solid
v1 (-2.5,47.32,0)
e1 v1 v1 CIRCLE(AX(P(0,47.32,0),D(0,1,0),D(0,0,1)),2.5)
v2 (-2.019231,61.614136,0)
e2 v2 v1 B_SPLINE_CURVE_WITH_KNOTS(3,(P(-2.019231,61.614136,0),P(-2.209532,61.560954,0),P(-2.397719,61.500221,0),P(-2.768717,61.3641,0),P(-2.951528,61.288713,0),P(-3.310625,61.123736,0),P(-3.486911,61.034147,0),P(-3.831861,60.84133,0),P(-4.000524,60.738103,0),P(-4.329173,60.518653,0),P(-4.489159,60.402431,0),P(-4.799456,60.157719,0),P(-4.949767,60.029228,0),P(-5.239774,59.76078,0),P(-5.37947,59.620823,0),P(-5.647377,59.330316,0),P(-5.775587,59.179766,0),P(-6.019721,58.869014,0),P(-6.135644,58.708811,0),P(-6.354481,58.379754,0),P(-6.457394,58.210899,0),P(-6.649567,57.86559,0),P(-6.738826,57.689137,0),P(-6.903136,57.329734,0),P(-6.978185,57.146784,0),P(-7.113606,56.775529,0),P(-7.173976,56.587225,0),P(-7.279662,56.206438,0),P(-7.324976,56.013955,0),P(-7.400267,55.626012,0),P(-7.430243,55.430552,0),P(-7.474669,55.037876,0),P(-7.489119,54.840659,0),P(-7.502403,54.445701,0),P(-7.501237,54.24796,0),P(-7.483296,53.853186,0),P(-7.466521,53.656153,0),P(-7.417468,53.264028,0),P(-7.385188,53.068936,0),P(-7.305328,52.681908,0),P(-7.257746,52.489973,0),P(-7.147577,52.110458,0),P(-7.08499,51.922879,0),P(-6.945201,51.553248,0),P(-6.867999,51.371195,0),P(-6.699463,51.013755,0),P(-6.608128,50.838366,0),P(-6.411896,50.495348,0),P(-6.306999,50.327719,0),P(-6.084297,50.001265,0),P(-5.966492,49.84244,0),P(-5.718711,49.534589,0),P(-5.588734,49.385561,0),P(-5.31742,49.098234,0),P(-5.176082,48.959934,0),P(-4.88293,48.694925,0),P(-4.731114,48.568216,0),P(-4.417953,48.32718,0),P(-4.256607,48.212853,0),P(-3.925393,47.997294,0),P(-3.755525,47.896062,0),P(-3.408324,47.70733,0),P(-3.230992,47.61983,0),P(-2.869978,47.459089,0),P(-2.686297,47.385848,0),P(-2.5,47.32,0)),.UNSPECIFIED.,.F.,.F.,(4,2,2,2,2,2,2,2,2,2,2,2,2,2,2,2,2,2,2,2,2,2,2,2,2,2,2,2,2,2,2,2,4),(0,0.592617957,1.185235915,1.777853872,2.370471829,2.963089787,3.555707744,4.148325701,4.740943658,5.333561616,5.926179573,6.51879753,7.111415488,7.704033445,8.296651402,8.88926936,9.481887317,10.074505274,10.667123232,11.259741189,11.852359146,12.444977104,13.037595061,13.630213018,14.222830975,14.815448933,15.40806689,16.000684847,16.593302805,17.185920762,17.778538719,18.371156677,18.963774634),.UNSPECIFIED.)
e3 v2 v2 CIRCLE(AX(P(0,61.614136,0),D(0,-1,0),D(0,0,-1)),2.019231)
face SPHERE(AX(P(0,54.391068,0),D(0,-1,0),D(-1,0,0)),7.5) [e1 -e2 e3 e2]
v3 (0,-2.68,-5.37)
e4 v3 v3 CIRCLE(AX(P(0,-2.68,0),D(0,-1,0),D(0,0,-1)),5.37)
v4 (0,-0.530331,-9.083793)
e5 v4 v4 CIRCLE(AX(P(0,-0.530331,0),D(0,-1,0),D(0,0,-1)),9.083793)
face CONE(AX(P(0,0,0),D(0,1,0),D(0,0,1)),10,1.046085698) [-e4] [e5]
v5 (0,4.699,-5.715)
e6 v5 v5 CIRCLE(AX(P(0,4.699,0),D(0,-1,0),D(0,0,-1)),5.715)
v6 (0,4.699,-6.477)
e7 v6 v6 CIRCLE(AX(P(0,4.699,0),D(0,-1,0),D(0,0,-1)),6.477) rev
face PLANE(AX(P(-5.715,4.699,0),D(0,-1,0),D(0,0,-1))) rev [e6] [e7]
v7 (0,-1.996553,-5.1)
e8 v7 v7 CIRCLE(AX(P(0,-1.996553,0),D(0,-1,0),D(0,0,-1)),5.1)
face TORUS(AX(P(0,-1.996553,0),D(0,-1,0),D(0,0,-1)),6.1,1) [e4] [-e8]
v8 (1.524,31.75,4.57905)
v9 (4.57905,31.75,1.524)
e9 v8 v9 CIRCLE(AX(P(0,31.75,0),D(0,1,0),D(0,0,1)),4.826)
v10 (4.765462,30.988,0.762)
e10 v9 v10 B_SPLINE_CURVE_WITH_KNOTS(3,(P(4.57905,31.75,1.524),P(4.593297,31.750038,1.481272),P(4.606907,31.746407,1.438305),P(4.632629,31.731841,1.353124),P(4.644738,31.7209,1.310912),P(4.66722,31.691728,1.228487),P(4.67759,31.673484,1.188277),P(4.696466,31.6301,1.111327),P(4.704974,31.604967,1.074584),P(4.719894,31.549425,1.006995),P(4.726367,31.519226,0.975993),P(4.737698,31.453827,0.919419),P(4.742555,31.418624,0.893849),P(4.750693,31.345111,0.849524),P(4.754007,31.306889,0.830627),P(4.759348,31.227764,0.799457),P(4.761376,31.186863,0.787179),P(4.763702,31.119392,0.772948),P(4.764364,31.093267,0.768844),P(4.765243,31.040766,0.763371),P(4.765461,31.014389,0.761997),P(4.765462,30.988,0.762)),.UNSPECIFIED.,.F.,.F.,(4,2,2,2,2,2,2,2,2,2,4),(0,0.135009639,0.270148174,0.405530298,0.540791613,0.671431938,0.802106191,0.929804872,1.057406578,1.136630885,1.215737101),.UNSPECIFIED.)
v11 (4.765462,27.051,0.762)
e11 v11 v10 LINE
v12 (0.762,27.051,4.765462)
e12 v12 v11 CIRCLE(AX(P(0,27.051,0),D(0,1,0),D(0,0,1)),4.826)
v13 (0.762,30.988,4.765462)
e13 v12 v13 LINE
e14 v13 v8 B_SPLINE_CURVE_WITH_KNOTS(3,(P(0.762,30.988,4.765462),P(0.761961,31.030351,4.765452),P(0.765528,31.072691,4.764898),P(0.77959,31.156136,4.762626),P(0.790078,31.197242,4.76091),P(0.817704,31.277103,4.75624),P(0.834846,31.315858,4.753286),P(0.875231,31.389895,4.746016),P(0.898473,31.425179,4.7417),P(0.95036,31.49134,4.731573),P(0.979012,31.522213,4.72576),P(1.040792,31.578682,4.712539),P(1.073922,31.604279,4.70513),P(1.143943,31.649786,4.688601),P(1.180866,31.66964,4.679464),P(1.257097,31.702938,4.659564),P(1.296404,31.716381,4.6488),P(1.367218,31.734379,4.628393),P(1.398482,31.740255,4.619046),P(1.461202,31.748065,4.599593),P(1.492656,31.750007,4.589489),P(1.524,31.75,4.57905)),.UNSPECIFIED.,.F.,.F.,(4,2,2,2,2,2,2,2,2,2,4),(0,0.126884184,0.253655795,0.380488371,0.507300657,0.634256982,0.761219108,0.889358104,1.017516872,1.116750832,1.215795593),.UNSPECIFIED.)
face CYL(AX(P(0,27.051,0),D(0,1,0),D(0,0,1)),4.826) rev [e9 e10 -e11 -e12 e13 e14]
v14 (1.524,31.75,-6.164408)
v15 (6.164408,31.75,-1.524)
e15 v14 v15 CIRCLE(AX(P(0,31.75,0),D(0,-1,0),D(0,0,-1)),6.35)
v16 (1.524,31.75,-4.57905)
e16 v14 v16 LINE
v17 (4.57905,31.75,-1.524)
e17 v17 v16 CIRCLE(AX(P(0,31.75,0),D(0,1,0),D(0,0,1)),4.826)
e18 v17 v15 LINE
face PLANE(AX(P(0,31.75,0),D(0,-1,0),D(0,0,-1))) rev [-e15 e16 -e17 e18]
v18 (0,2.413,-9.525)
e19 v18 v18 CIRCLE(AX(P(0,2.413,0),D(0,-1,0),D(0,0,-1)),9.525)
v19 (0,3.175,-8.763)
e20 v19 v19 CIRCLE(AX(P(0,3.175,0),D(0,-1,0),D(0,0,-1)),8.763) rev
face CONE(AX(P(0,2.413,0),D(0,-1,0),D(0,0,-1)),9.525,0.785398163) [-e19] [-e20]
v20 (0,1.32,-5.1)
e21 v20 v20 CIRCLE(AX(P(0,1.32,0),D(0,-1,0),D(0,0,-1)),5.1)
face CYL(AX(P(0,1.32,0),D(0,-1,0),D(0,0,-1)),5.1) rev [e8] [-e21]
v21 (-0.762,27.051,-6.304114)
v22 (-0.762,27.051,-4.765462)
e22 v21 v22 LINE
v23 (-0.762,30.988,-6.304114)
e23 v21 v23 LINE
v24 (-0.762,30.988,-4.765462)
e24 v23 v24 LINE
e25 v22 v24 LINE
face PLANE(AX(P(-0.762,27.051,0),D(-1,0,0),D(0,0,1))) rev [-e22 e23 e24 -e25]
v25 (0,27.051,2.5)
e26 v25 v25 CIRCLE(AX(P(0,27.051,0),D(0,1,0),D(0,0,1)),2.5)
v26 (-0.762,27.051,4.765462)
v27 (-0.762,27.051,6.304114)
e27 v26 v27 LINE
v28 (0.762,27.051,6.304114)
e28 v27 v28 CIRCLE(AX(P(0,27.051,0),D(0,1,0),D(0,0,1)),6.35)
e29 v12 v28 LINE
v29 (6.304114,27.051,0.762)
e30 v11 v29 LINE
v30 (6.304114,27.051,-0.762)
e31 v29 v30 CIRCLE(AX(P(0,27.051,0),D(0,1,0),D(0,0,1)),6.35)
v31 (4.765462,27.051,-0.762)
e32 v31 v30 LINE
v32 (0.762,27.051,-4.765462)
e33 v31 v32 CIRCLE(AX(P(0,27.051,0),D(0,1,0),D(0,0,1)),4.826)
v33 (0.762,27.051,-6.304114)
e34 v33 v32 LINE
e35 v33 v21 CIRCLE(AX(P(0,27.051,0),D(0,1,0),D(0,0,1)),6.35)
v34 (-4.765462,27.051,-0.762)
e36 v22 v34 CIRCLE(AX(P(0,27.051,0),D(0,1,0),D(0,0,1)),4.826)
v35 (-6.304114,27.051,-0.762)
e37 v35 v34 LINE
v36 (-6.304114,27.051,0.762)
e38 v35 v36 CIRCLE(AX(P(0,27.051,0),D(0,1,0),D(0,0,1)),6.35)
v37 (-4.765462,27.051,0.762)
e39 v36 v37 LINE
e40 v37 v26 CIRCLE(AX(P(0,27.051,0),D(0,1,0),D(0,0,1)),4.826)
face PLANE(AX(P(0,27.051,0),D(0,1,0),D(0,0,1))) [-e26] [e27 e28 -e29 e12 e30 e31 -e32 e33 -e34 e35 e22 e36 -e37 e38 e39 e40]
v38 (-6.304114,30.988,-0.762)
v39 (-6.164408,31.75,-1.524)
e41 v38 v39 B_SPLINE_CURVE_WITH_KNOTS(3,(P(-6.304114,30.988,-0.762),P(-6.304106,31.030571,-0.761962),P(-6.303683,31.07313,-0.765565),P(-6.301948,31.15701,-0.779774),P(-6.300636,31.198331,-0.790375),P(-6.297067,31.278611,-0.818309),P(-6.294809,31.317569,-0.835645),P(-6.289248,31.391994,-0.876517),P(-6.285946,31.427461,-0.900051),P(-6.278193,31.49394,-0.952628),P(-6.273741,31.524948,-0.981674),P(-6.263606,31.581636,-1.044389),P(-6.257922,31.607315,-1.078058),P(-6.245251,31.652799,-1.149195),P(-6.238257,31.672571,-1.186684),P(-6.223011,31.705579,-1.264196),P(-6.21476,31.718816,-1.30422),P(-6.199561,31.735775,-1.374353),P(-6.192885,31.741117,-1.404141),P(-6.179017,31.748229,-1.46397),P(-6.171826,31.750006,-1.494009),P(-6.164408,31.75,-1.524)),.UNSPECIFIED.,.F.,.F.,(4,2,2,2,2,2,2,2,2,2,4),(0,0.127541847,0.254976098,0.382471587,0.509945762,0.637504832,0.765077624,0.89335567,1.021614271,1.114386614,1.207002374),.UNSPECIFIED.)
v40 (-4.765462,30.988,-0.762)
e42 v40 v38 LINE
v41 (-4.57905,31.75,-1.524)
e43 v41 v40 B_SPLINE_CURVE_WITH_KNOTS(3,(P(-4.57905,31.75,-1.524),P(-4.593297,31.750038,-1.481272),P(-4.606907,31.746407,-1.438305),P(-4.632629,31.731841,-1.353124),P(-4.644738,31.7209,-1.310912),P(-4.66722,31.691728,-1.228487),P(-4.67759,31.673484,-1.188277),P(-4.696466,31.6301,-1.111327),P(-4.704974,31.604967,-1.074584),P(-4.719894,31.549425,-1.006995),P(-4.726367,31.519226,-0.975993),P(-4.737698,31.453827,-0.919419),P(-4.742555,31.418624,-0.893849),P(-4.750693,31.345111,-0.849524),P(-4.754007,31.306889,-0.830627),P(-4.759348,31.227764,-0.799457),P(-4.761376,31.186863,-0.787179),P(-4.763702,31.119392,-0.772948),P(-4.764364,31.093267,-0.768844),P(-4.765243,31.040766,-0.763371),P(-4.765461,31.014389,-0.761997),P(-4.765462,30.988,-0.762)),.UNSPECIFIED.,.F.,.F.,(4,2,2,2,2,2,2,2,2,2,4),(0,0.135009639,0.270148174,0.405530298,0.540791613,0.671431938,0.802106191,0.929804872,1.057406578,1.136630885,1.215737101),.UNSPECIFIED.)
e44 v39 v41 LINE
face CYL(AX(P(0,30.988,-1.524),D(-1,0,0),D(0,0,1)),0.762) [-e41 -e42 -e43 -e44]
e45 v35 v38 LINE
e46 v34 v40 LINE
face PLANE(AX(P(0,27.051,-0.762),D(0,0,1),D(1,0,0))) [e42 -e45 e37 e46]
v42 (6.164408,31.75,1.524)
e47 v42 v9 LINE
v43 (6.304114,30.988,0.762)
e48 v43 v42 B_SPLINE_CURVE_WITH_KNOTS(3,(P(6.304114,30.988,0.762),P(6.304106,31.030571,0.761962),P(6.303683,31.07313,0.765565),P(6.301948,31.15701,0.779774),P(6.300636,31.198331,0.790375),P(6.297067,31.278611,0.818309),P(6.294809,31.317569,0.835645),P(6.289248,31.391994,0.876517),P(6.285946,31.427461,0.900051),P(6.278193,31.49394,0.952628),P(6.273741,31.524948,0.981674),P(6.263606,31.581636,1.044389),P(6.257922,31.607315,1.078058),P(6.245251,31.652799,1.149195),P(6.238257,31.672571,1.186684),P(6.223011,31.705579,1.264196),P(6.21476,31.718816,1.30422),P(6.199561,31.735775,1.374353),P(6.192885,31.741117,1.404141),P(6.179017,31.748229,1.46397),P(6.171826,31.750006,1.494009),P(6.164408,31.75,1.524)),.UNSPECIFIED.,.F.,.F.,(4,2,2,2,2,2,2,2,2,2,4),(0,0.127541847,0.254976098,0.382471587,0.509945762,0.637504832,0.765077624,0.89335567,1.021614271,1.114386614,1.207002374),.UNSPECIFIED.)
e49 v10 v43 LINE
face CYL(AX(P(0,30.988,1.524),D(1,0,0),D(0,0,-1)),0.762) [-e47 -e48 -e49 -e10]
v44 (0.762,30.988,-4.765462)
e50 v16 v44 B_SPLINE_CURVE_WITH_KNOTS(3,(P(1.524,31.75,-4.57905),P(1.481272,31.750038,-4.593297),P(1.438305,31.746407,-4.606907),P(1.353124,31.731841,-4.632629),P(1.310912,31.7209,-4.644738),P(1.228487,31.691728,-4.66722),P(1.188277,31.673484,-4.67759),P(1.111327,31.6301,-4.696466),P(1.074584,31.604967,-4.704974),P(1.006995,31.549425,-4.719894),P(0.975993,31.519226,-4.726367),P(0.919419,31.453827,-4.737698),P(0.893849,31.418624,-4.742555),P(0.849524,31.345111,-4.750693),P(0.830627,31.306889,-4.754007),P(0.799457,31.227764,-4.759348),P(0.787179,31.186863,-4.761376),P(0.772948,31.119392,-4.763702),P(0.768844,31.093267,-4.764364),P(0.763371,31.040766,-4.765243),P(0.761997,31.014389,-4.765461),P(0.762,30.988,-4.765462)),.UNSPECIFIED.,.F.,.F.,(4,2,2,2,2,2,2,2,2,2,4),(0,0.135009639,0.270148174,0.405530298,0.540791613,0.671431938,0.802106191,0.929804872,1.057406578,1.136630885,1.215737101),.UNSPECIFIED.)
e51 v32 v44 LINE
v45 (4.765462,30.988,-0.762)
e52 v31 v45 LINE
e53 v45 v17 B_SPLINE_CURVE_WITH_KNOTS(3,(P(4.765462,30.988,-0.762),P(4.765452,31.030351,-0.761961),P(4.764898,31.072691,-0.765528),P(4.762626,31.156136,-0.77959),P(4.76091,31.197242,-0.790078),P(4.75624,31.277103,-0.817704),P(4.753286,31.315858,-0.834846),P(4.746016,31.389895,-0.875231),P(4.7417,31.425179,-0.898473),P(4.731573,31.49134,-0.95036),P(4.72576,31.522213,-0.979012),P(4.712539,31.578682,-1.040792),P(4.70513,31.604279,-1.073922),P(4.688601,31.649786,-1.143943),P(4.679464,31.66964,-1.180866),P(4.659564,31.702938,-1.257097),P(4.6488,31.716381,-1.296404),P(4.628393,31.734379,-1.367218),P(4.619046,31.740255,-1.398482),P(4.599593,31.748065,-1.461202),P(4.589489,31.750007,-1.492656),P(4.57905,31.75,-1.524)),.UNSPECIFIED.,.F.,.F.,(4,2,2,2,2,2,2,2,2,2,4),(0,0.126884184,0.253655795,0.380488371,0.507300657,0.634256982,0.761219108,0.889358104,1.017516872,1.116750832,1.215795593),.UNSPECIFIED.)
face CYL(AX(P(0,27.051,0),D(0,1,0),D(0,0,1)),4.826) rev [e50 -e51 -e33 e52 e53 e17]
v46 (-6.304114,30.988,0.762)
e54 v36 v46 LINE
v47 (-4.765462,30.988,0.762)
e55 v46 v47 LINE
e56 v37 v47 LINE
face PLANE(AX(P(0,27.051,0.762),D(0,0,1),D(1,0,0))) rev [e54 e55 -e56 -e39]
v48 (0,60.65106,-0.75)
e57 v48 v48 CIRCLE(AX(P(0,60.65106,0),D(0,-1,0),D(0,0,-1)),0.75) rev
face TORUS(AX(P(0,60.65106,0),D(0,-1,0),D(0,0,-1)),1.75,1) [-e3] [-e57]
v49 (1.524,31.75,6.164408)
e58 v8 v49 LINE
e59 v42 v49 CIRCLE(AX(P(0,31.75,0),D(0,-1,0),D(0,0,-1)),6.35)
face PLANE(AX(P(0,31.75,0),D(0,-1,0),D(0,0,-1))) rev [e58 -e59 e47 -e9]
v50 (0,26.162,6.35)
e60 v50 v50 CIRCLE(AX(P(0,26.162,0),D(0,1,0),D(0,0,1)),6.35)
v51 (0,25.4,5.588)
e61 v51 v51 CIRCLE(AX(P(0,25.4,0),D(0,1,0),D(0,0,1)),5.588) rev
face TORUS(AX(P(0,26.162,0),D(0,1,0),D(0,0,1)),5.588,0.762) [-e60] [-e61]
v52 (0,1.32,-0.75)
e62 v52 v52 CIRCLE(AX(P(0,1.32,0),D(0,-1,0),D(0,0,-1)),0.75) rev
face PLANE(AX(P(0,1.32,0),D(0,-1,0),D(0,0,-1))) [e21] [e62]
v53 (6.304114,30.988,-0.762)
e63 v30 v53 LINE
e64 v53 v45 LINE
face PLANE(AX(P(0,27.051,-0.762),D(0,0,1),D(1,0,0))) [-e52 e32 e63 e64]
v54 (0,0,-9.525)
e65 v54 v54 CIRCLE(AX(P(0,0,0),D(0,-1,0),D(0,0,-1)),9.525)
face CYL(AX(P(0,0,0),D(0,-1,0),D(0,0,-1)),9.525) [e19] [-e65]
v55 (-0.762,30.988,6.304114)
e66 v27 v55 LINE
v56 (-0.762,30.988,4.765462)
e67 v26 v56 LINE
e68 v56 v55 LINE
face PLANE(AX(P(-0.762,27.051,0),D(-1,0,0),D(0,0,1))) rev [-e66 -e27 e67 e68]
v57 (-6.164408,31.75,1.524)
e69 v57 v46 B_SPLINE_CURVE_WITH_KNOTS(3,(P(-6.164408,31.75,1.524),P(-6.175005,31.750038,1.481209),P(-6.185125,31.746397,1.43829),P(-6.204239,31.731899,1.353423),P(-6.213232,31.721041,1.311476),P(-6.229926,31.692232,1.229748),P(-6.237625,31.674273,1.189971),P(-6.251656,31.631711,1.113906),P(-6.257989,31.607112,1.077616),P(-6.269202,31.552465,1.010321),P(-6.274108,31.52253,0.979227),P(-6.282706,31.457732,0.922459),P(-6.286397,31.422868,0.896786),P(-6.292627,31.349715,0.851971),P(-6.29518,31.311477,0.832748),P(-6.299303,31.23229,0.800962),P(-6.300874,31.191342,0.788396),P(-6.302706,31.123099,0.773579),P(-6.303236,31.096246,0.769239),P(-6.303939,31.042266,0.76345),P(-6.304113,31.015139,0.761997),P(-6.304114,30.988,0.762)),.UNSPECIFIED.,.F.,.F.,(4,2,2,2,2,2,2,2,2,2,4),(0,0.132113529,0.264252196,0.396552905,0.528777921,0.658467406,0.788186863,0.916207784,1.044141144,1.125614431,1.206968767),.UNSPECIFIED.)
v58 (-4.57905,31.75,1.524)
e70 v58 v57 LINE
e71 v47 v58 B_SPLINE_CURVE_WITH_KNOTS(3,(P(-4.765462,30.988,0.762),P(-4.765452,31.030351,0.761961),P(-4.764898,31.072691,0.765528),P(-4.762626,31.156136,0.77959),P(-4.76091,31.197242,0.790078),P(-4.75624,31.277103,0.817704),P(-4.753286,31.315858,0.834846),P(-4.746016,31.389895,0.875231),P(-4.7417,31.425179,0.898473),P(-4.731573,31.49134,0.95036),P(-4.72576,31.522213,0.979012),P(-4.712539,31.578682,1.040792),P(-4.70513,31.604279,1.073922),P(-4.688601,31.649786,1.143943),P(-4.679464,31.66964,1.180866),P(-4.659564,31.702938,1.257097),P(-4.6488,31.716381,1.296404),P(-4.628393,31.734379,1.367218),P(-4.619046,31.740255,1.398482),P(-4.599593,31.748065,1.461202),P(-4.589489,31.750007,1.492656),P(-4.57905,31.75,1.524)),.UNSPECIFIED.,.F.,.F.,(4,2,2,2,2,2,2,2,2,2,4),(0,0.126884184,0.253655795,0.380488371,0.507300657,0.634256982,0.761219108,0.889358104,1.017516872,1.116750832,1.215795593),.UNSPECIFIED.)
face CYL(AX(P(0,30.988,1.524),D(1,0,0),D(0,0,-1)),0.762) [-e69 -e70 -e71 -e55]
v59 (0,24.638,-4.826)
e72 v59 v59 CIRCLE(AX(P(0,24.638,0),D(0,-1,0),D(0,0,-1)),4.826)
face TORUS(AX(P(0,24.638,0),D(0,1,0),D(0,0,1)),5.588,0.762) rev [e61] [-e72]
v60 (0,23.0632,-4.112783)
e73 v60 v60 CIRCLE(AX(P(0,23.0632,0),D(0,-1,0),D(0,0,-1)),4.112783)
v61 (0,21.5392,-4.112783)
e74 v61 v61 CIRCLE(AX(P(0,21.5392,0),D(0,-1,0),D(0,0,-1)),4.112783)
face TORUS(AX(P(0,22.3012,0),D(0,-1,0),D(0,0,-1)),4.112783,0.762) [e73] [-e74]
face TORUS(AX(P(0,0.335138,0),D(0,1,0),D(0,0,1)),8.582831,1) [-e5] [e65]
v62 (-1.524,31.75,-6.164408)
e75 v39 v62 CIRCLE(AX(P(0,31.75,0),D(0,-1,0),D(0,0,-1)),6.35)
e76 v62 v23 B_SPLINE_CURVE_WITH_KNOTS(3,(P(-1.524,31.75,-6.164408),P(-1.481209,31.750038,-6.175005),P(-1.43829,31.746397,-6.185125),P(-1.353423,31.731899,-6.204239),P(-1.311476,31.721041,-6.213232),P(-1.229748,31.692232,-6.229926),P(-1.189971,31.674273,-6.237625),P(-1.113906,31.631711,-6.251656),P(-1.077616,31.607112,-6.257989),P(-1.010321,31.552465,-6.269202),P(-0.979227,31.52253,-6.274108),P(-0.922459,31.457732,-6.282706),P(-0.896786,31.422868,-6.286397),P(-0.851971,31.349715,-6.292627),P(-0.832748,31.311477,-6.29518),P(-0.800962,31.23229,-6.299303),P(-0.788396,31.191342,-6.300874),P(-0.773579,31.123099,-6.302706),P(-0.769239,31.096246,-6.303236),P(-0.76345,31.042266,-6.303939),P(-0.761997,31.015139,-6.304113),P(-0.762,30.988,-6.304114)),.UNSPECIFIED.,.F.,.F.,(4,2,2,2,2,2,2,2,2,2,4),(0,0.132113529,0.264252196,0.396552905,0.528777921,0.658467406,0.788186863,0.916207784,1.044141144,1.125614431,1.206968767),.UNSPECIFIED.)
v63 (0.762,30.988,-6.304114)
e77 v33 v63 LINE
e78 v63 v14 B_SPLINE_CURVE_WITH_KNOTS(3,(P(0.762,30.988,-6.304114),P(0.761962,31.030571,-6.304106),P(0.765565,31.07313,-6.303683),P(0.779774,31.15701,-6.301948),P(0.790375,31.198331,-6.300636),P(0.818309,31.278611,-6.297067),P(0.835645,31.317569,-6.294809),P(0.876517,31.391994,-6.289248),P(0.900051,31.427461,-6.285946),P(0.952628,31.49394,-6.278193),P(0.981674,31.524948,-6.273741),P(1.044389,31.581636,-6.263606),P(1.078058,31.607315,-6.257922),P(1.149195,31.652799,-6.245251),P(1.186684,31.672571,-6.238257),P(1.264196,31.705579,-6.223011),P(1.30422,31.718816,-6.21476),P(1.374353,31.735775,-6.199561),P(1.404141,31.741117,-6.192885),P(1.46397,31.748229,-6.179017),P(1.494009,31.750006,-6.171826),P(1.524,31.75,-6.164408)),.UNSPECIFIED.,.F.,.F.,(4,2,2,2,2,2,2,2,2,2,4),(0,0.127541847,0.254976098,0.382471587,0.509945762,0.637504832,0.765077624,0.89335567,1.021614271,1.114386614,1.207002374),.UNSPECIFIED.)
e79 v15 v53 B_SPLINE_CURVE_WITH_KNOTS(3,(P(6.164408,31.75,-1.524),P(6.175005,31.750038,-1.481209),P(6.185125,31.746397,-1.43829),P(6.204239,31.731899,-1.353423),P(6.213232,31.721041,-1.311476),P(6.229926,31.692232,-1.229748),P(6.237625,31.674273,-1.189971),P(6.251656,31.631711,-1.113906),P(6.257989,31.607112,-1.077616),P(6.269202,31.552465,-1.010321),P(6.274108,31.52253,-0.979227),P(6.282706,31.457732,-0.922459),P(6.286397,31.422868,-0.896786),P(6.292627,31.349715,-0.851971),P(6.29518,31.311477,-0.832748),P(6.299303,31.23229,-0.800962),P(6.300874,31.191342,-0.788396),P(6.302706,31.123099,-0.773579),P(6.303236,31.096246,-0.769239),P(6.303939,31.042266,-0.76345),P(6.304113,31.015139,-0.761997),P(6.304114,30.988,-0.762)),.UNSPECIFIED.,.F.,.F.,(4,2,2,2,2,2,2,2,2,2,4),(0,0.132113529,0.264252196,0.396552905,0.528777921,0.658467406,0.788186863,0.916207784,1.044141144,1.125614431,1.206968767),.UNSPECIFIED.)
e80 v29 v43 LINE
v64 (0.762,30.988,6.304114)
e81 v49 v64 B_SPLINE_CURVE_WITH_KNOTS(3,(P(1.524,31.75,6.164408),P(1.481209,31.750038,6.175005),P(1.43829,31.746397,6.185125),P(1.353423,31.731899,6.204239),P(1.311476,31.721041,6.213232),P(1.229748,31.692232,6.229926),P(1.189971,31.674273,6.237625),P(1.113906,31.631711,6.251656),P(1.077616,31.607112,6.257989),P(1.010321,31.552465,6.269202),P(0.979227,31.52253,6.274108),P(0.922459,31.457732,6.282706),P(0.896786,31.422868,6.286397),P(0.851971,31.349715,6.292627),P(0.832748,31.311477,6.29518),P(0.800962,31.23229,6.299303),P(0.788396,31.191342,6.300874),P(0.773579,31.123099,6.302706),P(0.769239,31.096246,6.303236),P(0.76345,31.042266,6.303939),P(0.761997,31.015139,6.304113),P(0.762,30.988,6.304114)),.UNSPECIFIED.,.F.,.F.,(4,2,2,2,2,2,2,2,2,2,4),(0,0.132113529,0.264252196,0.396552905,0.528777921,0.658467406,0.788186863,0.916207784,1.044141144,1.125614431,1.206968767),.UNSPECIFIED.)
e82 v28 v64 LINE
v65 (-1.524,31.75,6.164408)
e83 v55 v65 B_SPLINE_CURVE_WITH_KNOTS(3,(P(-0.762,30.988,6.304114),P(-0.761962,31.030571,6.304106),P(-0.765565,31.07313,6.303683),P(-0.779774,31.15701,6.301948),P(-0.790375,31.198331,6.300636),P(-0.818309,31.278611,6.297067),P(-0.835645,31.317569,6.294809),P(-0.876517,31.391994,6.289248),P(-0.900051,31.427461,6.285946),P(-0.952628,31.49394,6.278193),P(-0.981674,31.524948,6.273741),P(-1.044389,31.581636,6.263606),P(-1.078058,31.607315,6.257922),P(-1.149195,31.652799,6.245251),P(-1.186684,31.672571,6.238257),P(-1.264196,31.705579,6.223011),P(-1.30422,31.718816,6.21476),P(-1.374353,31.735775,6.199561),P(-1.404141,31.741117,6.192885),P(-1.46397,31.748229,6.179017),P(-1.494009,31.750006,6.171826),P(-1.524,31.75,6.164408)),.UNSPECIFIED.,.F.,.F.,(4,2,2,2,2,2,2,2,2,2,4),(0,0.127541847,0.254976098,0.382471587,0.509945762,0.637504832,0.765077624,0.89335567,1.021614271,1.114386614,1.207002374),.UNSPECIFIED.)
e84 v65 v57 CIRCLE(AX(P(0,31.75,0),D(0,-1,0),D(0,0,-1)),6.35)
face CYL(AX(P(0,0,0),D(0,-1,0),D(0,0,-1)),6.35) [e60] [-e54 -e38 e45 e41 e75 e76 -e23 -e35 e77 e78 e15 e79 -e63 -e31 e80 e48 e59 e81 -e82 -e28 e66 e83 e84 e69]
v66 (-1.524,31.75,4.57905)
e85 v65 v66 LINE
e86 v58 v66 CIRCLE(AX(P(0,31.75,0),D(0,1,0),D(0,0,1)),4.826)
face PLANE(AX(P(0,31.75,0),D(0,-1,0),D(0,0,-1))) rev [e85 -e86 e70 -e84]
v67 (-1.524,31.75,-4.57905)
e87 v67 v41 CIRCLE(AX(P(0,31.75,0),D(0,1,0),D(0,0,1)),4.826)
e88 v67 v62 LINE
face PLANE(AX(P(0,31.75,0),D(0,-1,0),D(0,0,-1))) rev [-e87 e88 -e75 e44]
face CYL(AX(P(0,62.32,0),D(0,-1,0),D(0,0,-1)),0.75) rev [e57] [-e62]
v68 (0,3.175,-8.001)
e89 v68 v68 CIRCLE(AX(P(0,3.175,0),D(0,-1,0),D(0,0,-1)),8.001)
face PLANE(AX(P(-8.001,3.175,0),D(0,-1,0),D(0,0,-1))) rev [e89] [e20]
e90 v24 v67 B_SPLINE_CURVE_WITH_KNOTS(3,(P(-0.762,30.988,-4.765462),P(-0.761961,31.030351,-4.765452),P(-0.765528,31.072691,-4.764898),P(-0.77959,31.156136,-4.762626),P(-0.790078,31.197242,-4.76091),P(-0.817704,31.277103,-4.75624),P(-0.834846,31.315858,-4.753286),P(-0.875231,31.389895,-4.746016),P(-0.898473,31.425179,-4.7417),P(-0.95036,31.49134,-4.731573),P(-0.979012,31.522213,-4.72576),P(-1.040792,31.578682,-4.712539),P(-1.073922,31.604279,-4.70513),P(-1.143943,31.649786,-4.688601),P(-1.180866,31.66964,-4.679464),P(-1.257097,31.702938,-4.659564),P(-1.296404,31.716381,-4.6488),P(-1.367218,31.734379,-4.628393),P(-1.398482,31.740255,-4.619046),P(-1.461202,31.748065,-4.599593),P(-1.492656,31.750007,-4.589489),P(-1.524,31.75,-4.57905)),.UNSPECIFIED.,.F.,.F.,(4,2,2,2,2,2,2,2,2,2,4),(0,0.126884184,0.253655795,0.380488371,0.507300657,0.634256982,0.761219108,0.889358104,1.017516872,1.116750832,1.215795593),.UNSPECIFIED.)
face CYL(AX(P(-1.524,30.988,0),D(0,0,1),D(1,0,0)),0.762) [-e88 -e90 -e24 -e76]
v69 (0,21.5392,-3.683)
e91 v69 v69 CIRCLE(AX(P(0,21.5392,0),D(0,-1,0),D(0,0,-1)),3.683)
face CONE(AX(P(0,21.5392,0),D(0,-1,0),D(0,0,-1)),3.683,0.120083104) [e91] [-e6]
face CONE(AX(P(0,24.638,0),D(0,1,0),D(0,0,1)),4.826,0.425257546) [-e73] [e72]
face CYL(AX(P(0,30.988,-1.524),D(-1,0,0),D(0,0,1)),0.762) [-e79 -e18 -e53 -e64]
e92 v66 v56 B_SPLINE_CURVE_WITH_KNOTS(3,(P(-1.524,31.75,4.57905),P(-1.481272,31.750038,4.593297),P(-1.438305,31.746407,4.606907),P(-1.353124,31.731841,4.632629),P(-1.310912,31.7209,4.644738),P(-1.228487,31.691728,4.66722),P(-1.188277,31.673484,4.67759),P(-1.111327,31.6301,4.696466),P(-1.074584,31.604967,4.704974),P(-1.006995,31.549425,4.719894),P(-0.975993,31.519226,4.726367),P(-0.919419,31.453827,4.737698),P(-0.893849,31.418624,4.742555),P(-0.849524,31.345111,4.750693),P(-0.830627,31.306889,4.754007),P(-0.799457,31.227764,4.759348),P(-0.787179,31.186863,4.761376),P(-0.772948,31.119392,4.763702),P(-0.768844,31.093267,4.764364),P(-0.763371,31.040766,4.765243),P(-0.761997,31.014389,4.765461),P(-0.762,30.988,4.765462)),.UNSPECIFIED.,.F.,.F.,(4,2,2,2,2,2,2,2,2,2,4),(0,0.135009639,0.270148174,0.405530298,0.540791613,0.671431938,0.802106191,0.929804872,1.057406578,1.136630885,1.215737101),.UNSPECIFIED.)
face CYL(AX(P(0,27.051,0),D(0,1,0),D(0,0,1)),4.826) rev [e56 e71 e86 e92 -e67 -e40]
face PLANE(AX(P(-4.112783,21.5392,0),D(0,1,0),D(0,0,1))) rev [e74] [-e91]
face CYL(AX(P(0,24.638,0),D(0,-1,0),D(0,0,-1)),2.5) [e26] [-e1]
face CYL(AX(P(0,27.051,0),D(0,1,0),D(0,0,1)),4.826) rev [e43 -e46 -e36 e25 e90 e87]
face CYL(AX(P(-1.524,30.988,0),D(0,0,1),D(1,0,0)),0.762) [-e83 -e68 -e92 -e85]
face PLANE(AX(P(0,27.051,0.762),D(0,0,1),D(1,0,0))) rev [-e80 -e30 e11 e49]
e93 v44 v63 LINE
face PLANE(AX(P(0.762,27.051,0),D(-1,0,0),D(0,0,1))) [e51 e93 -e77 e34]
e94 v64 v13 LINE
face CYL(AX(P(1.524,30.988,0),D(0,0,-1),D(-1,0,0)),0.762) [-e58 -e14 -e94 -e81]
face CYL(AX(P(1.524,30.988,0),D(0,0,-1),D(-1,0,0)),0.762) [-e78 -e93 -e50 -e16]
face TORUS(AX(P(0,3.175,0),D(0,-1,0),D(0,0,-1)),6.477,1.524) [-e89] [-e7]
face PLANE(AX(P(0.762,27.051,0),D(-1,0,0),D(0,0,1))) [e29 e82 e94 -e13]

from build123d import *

# Parameters (mm, degrees)
CHAMFER1_SIZE      = 0.762
FILLET1_R          = 0.762
CUT_EXTRUDE4_START = -4.699
CUT_EXTRUDE4_DEPTH = 4.699
FILLET2_R          = 0.762
FILLET3_R          = 1.524
SKETCH5_ONE_SIDE_W = 2.5
SKETCH5_ONE_SIDE_H = 22.682
SKETCH6_R          = 0.75
CUT_EXTRUDE5_DEPTH = 65
SKETCH7_R          = 5.1000000000000005
CUT_EXTRUDE6_DEPTH = 4
FILLET4_R          = 1


# Some blends are built 0.0001 mm under size
with BuildPart() as part:
    # Sketch1 → Revolve1 (revolve)
    with BuildSketch(Plane.XY, mode=Mode.PRIVATE) as revolve1_sk:
        with BuildLine():
            Line((0, 0), (0, 31.75))
            Line((0, 31.75), (-6.35, 31.75))
            Line((-6.35, 31.75), (-6.349999999999998, 25.4))
            Line((-6.349999999999998, 25.4), (-4.825999999999998, 25.4))
            Line((-4.825999999999998, 25.4), (-4.825999999999998, 24.638))
            Line((-4.825999999999998, 24.638), (-4.112783335413436, 23.0632))
            ThreePointArc((-4.112783335413436, 23.0632), (-4.874783335413493, 22.301200000000033), (-4.112783335413496, 21.539199999999997))
            Line((-4.112783335413496, 21.539199999999997), (-3.683, 21.539199999999997))
            Line((-3.683, 21.539199999999997), (-5.715, 4.699))
            Line((-5.715, 4.699), (-8.001, 4.699))
            Line((-8.001, 4.699), (-8.001, 3.1749999999999994))
            Line((-8.001, 3.1749999999999994), (-9.524999999999999, 3.175))
            Line((-9.524999999999999, 3.175), (-9.525, 0))
            Line((-9.525, 0), (0, 0))
        make_face()
    revolve(revolve1_sk.sketch.rotate(Axis((0, 0, 0), (0, 1, 0)), 270), axis=Axis((0, 0, 0), (0, 1, 0)))

    # Chamfer1
    chamfer1_edges = [part.edges().sort_by_distance(p)[0] for p in [
        (-3.28e-15, 3.175, 9.524999999999999),
    ]]
    chamfer(chamfer1_edges, length=CHAMFER1_SIZE)

    # Fillet1
    fillet1_edges = [part.edges().sort_by_distance(p)[0] for p in [
        (-1.66e-15, 25.4, 4.825999999999998),
        (-2.19e-15, 25.4, 6.349999999999998),
    ]]
    fillet(fillet1_edges, radius=FILLET1_R - 0.0001)  # a hair under: the kernel refuses the full size

    # Sketch2 → Cut-Extrude4 (cut)
    with BuildSketch(Plane(origin=(0, 31.75, 0), x_dir=(1, 0, 0), z_dir=(0, 1, 0)).offset(CUT_EXTRUDE4_START)):
        with BuildLine():
            Line((0.7619999999999992, 4.765462411980587), (0.7619999999999998, 0.7620000000000005))
            Line((0.7620000000000005, 0.7620000000000001), (4.765462411980588, 0.7620000000000001))
            ThreePointArc((4.765462411980596, 0.7620000000000517), (3.41249732600628, 3.4124973260062763), (0.7620000000000579, 4.765462411980595))
        make_face()
        with BuildLine():
            ThreePointArc((-0.7619999999999283, 4.765462411980615), (-3.4124973260062657, 3.4124973260062905), (-4.765462411980609, 0.761999999999965))
            Line((-4.765462411980616, 0.7620000000000001), (-0.7620000000000005, 0.7620000000000001))
            Line((-0.7620000000000001, 0.7620000000000005), (-0.7620000000000007, 4.765462411980627))
        make_face()
        with BuildLine():
            Line((-0.7620000000000005, -0.7619999999999999), (-4.765462411980616, -0.7619999999999999))
            ThreePointArc((-4.76546241198061, -0.7619999999999638), (-3.4124973260062665, -3.4124973260062896), (-0.7619999999999294, -4.765462411980615))
            Line((-0.7619999999999995, -4.765462411980625), (-0.762, -0.7620000000000005))
        make_face()
        with BuildLine():
            Line((4.765462411980588, -0.7619999999999999), (0.7620000000000005, -0.7619999999999999))
            Line((0.7619999999999999, -0.7620000000000005), (0.7620000000000005, -4.765462411980586))
            ThreePointArc((0.7620000000000589, -4.765462411980595), (3.4124973260062803, -3.4124973260062754), (4.765462411980596, -0.7620000000000524))
        make_face()
        with BuildLine():
            Line((-4.765462411980616, 0.7620000000000001), (-6.304114212163325, 0.7620000000000001))
            ThreePointArc((-6.30411421216334, 0.7620000000001262), (-6.35, 7.8e-16), (-6.30411421216334, -0.7620000000001247))
            Line((-6.3041142121633245, -0.7619999999999999), (-4.765462411980616, -0.7619999999999999))
            ThreePointArc((-4.76546241198061, -0.7619999999999638), (-4.826, 5.9e-16), (-4.765462411980609, 0.761999999999965))
        make_face()
        with BuildLine():
            ThreePointArc((6.35, 0), (6.338518172539906, 0.38169015756418134), (6.3041142121633476, 0.7620000000000579))
            Line((6.30411421216334, 0.7620000000000001), (4.765462411980588, 0.7620000000000001))
            ThreePointArc((4.765462411980596, 0.7620000000000517), (4.81084179745179, 0.3822004708144948), (4.826, 0))
            ThreePointArc((4.826, -1.18e-15), (4.810841797451791, -0.3822004708144936), (4.765462411980596, -0.7620000000000524))
            Line((4.765462411980588, -0.7619999999999999), (6.30411421216334, -0.7619999999999999))
            ThreePointArc((6.3041142121633476, -0.7620000000000626), (6.338518172539906, -0.38169015756418173), (6.35, -1.56e-15))
        make_face()
        with BuildLine():
            ThreePointArc((0.7619999999999425, 6.304114212163362), (-3.345e-14, 6.35), (-0.7620000000000103, 6.304114212163354))
            Line((-0.7620000000000008, 6.304114212163352), (-0.7620000000000007, 4.765462411980627))
            ThreePointArc((-0.7619999999999283, 4.765462411980615), (6.459e-14, 4.826), (0.7620000000000569, 4.765462411980595))
            Line((0.7619999999999992, 4.765462411980587), (0.7619999999999991, 6.304114212163368))
        make_face()
        with BuildLine():
            Line((-0.7619999999999995, -4.765462411980625), (-0.7619999999999993, -6.304114212163352))
            ThreePointArc((-0.7620000000000118, -6.304114212163354), (-3.501e-14, -6.35), (0.7619999999999423, -6.304114212163362))
            Line((0.7620000000000006, -6.30411421216337), (0.7620000000000005, -4.765462411980586))
            ThreePointArc((0.7620000000000589, -4.765462411980595), (6.77e-14, -4.826), (-0.7619999999999294, -4.765462411980615))
        make_face()
        with BuildLine():
            Line((0.7620000000000005, -0.7619999999999999), (-0.7620000000000005, -0.7619999999999999))
            Line((-0.762, -0.7620000000000005), (-0.7619999999999995, -4.765462411980625))
            ThreePointArc((-0.7619999999999294, -4.765462411980615), (6.77e-14, -4.826), (0.7620000000000589, -4.765462411980595))
            Line((0.7620000000000005, -4.765462411980586), (0.7619999999999999, -0.7620000000000005))
        make_face()
        Polygon((0.7620000000000005, 0.7620000000000001), (-0.7620000000000005, 0.7620000000000001), (-0.762, -0.7620000000000005), (0.7620000000000005, -0.7619999999999999), align=None)
        with BuildLine():
            Line((-0.7620000000000005, 0.7620000000000001), (-4.765462411980616, 0.7620000000000001))
            ThreePointArc((-4.765462411980609, 0.761999999999965), (-4.826, 5.9e-16), (-4.76546241198061, -0.7619999999999638))
            Line((-4.765462411980616, -0.7619999999999999), (-0.7620000000000005, -0.7619999999999999))
            Line((-0.762, -0.7620000000000005), (-0.7620000000000001, 0.7620000000000005))
        make_face()
        with BuildLine():
            Line((-0.7620000000000007, 4.765462411980627), (-0.7620000000000001, 0.7620000000000005))
            Line((-0.7620000000000005, 0.7620000000000001), (0.7620000000000005, 0.7620000000000001))
            Line((0.7619999999999998, 0.7620000000000005), (0.7619999999999992, 4.765462411980587))
            ThreePointArc((0.7620000000000569, 4.765462411980595), (6.459e-14, 4.826), (-0.7619999999999283, 4.765462411980615))
        make_face()
        with BuildLine():
            Line((4.765462411980588, 0.7620000000000001), (0.7620000000000005, 0.7620000000000001))
            Line((0.7619999999999998, 0.7620000000000005), (0.7619999999999999, -0.7620000000000005))
            Line((0.7620000000000005, -0.7619999999999999), (4.765462411980588, -0.7619999999999999))
            ThreePointArc((4.765462411980596, -0.7620000000000524), (4.810841797451791, -0.3822004708144936), (4.826, -1.18e-15))
            ThreePointArc((4.826, 0), (4.81084179745179, 0.3822004708144948), (4.765462411980596, 0.7620000000000517))
        make_face()
    extrude(amount=CUT_EXTRUDE4_DEPTH, mode=Mode.SUBTRACT)

    # Fillet2
    fillet2_edges = [part.edges().sort_by_distance(p)[0] for p in [
        (5.534788312071964, 31.75, -0.7620000000000001),
        (0.7620000000000005, 31.75, 5.534788312071978),
        (-5.534788312071971, 31.75, -0.7620000000000001),
        (0.7619999999999991, 31.75, -5.534788312071978),
        (-0.7620000000000007, 31.75, -5.534788312071989),
        (-5.534788312071971, 31.75, 0.7619999999999999),
        (-0.7619999999999993, 31.75, 5.5347883120719885),
        (5.534788312071964, 31.75, 0.7619999999999999),
    ]]
    fillet(fillet2_edges, radius=FILLET2_R)

    # Fillet3
    fillet3_edges = [part.edges().sort_by_distance(p)[0] for p in [
        (-2.76e-15, 4.699, 8.001),
    ]]
    fillet(fillet3_edges, radius=FILLET3_R - 0.0001)  # a hair under: the kernel refuses the full size

    # Sketch5 one side → Revolve3 (revolve)
    with BuildSketch(Plane.XY):
        with BuildLine():
            Line((0, 46.89106781186547), (0, 61.89106781186547))
            ThreePointArc((2.0363e-13, 61.891067811865476), (-7.5, 54.391067811865476), (2.0512e-13, 46.891067811865476))
        make_face()
        Polygon((0, 0), (-10, -1.22e-15), (-5.37, -2.68), (0, -2.680000000000002), align=None)
        with Locations((-1.25, 35.979)):
            Rectangle(SKETCH5_ONE_SIDE_W, SKETCH5_ONE_SIDE_H)
    revolve(axis=Axis((0, 24.638, 0), (0, 1, 0)))

    # Sketch6 → Cut-Extrude5 (cut)
    with BuildSketch(Plane.XZ.offset(2.680000000000001)):
        with Locations(Location((0, 0, 0), (0, 0, 270))):
            Circle(SKETCH6_R)
    extrude(amount=-CUT_EXTRUDE5_DEPTH, mode=Mode.SUBTRACT)

    # Sketch7 → Cut-Extrude6 (cut)
    with BuildSketch(Plane.XZ.offset(2.680000000000001)):
        with Locations(Location((0, 0, 0), (0, 0, 270))):
            Circle(SKETCH7_R)
    extrude(amount=-CUT_EXTRUDE6_DEPTH, mode=Mode.SUBTRACT)

    # Fillet4
    # the kernel refuses this fillet: 1 mm, written as the material it takes off along each edge
    with BuildSketch(Plane(origin=(0, 0, 0), x_dir=(-1, 0, 0), z_dir=(0, 0, -1))) as fillet4_piece_1:
        with BuildLine():
            CenterArc((8.582830845240165, 0.3351377087394656), FILLET4_R, 300.06370450944223, 40.35538333384966)
            Line((9.08379342931, -0.5303312331423761), (10, 0))
            Line((10, 0), (9.525, 1.7e-16))
        make_face()
    revolve(axis=Axis((0, 0, 0), (0, 1, 0)), mode=Mode.SUBTRACT)
    with BuildSketch(Plane(origin=(2.2e-16, 61.85347359016512, 0), x_dir=(-1, 0, 1.8e-16), z_dir=(1.8e-16, 0, 1))) as fillet4_piece_2:
        with BuildLine():
            CenterArc((1.7500000000000002, 1.2024137655251934), FILLET4_R, 180, 105.6184982756485)
            ThreePointArc((2.019230769230769, 0.23933807125219886), (1.3897771193257187, 0.09229590404412846), (0.75, 0))
            Line((0.75, 0), (0.7500000000000002, 1.2024137655251934))
        make_face()
    revolve(axis=Axis((2.2e-16, 61.85347359016512, 0), (0, -1, 0)), revolution_arc=90, mode=Mode.SUBTRACT)
    with BuildSketch(Plane(origin=(0, -2.680000000000001, 0), x_dir=(-1.8e-16, 0, -1), z_dir=(-1, 0, 1.8e-16))) as fillet4_piece_3:
        with BuildLine():
            CenterArc((6.1000000000000005, -0.6834471449936719), FILLET4_R, 136.88639405410134, 43.113605945898655)
            Line((5.1000000000000005, -0.6834471449936719), (5.1000000000000005, 0))
            Line((5.1000000000000005, 0), (5.37, -1.33e-15))
        make_face()
    revolve(axis=Axis((0, -2.680000000000001, 0), (0, -1, 0)), mode=Mode.SUBTRACT)
    with BuildSketch(Plane(origin=(2.2e-16, 61.85347359016512, 0), x_dir=(0, 0, -1), z_dir=(-1, 0, 0))) as fillet4_piece_4:
        with BuildLine():
            CenterArc((1.75, 1.2024137655251934), FILLET4_R, 180, 105.6184982756485)
            ThreePointArc((2.0192307692307687, 0.23933807125219886), (1.3897771193257187, 0.09229590404412846), (0.75, 0))
            Line((0.75, 0), (0.75, 1.2024137655251934))
        make_face()
    revolve(axis=Axis((2.2e-16, 61.85347359016512, 0), (0, -1, 0)), revolution_arc=270, mode=Mode.SUBTRACT)


solid = part.part
